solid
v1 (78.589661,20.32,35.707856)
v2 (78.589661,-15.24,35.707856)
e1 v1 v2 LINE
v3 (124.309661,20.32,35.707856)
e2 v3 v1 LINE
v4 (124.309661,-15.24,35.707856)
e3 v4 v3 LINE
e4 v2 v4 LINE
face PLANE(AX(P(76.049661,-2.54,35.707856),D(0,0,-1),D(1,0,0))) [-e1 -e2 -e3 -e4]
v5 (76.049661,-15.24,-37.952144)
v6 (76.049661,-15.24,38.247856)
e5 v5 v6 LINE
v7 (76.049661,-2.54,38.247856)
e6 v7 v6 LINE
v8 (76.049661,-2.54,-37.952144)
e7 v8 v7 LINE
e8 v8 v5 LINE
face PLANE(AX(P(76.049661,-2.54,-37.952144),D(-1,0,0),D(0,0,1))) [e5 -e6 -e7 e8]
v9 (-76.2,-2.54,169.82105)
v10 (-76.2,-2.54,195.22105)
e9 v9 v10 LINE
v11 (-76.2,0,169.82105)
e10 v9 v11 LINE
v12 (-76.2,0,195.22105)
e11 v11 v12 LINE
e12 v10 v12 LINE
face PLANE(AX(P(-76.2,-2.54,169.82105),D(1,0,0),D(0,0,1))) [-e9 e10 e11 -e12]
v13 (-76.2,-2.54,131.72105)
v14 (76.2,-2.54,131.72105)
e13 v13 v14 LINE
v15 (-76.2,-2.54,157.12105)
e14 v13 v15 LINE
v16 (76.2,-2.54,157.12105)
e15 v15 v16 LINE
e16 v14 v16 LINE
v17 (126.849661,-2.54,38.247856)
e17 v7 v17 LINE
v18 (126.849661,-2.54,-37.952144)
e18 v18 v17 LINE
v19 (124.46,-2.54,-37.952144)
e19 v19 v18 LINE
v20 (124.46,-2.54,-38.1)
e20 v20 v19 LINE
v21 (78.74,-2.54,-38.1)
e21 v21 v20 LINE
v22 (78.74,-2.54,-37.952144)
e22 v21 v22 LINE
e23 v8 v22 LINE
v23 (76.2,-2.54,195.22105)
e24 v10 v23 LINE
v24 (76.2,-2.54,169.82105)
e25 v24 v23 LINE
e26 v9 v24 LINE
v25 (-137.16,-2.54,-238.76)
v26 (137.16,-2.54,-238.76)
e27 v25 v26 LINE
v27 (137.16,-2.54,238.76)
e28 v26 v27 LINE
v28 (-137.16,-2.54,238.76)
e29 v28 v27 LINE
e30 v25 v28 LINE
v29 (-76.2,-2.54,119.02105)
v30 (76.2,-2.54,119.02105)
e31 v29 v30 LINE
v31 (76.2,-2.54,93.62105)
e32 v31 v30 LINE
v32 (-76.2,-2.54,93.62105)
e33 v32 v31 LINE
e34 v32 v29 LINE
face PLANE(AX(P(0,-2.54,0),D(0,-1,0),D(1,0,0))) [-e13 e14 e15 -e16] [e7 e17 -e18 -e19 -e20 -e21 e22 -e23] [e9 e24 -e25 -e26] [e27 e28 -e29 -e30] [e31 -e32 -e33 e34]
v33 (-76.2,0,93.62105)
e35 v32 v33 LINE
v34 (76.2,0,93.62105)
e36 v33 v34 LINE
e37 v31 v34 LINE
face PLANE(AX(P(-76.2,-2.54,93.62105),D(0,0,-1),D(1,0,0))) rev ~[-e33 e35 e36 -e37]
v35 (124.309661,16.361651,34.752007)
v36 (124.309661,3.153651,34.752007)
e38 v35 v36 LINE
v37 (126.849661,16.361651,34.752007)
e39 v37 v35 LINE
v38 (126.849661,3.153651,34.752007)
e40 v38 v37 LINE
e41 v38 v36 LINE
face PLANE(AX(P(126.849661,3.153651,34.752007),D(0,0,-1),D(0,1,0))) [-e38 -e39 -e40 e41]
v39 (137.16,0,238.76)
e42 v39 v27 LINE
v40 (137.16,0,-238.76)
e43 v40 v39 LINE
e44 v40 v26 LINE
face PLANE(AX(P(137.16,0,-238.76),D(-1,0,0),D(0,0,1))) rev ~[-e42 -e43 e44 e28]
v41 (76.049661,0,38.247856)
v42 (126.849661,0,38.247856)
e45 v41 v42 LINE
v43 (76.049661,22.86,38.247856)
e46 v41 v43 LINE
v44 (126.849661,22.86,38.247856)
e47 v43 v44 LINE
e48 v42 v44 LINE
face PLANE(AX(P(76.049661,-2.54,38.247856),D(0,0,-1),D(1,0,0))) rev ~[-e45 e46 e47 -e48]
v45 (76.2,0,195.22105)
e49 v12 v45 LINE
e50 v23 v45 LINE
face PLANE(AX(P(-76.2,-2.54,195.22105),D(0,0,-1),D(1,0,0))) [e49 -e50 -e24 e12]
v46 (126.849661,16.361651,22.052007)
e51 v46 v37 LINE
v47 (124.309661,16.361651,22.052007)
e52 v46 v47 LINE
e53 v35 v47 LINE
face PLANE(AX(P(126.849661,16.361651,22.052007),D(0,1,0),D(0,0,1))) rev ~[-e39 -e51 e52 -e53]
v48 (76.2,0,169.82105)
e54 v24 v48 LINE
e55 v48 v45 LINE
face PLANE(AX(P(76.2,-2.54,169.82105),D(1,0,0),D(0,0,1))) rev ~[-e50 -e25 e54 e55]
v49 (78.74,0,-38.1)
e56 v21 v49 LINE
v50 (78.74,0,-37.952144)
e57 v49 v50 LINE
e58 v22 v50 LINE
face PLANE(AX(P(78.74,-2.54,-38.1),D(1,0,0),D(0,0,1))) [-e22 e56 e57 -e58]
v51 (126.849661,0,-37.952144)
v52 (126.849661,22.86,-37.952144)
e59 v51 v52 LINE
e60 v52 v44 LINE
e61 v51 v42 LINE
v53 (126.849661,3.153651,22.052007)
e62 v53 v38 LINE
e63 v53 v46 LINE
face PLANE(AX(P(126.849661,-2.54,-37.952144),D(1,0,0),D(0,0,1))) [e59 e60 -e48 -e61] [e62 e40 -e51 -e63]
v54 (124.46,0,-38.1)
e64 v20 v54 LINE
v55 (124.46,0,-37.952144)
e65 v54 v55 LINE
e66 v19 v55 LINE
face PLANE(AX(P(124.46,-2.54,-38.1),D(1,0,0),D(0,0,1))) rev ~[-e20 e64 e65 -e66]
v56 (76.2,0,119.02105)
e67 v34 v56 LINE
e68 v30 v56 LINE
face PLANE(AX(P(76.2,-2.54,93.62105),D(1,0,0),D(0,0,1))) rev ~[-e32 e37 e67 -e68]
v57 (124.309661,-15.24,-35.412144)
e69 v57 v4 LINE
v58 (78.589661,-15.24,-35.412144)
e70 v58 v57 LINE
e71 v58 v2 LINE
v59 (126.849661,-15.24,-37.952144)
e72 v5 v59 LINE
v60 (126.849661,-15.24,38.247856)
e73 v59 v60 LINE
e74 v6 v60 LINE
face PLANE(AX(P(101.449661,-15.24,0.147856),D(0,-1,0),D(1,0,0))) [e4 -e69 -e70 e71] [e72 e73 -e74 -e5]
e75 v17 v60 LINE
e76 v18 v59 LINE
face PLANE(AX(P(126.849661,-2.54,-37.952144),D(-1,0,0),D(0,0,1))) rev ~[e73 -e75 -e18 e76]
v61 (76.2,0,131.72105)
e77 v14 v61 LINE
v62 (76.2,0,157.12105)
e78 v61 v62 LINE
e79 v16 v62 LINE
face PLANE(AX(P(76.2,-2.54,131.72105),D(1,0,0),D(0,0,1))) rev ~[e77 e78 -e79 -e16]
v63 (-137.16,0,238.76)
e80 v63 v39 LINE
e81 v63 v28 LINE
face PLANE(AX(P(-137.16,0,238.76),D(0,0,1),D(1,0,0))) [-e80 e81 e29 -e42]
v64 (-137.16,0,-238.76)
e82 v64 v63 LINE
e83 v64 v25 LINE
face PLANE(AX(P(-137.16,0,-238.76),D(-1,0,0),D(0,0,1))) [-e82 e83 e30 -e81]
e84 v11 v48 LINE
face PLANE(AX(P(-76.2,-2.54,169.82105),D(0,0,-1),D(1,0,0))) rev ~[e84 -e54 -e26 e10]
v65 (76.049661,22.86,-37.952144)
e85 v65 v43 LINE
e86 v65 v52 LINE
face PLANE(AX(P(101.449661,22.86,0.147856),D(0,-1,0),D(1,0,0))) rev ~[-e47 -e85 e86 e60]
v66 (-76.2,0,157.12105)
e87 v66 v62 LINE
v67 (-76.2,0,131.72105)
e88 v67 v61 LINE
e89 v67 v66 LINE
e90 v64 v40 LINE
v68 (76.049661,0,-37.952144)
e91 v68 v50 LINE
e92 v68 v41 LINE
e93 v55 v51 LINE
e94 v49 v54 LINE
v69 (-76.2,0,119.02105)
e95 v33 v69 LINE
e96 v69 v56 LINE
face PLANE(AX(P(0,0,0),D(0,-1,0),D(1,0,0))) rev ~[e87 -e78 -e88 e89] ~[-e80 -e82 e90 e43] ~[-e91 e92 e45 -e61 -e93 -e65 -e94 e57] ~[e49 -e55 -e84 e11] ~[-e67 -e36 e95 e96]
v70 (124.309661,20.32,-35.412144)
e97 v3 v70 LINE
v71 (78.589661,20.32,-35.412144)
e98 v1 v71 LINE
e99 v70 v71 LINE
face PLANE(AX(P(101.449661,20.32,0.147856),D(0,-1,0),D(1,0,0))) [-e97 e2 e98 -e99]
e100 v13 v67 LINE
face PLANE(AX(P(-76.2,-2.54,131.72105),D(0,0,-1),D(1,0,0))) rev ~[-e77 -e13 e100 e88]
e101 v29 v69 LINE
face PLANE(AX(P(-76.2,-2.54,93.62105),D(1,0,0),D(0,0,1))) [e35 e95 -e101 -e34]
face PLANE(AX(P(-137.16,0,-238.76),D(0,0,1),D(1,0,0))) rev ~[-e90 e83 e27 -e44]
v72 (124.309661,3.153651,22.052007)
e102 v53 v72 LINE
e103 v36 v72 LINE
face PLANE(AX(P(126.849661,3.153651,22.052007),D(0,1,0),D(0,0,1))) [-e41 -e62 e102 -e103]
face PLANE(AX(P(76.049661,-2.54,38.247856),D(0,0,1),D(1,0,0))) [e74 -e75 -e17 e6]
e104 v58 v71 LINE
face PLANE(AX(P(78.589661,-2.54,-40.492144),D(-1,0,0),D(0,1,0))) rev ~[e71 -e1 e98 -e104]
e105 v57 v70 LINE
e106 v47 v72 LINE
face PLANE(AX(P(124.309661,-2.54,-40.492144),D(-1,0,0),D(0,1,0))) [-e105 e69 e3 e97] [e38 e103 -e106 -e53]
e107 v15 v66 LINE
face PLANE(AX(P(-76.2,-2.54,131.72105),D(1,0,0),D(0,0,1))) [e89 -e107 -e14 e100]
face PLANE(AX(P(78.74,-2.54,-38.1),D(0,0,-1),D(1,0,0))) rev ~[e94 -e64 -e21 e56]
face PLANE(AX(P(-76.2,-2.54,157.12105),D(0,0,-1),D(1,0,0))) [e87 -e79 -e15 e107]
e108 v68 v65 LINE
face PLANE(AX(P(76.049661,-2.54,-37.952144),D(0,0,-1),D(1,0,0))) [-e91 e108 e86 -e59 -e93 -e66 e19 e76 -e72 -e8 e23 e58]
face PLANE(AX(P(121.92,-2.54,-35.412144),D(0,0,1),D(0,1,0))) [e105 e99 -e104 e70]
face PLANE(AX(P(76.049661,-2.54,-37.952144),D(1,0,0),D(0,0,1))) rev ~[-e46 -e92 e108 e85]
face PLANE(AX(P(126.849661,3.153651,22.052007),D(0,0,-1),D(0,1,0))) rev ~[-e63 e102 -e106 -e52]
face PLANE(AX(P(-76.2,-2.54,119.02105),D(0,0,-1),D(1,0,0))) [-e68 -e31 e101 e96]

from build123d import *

# Parameters (mm, degrees)
F0_W          = 274.32
F0_H          = 477.52
F1_DEPTH      = 2.54
F2_W          = 152.4
F2_H          = 25.4
F3_W          = 152.4
F3_H          = 25.4
F4_W          = 152.4
F4_H          = 25.4
F5_DEPTH      = 25.4
F6_W          = 45.72
F6_H          = 76.2
F7_DEPTH      = 25.4
F8_W          = 50.8
F8_H          = 76.2
F9_DEPTH      = 12.7
F9_DEPTH_BACK = 25.4
F10_T         = 2.54
F10_T3_DEPTH  = 7.4696609569
F10_T5_DEPTH  = 81.28
F10_T7_DEPTH  = 55.88
F10_T9_DEPTH  = 7.7703390431
F10_T11_DEPTH = 7.62
F11_W         = 13.208
F11_H         = 12.7
F12_DEPTH     = 25.4


# Not quite as in the source:
# - a shell that OpenCascade refuses in one call is made with other operations: the cavity is built on its own and cut out


with BuildPart() as f1:
    # F0 (on Front) → F1 (new body)
    with BuildSketch(Plane.XZ):
        Rectangle(F0_W, F0_H)
    extrude(amount=F1_DEPTH)

    # F2 (on face) + F3 (on face) + F4 (on face) → F5 (cut)
    with BuildSketch(Plane.XZ.offset(2.54)):
        with Locations((0, 182.5210501183)):
            Rectangle(F2_W, F2_H)
    with BuildSketch(Plane.XZ.offset(2.54)):
        with Locations((0, 144.4210501183)):
            Rectangle(F3_W, F3_H)
    with BuildSketch(Plane.XZ.offset(2.54)):
        with Locations((0, 106.3210501183)):
            Rectangle(F4_W, F4_H)
    extrude(amount=-F5_DEPTH, mode=Mode.SUBTRACT)

    # F6 (on face) → F7 (cut)
    with BuildSketch(Plane.XZ.offset(2.54)):
        with Locations((101.6, 0)):
            Rectangle(F6_W, F6_H)
    extrude(amount=-F7_DEPTH, mode=Mode.SUBTRACT)

    # F8 (on face) → F9 (join, two sides)
    with BuildSketch(Plane.XZ.offset(2.54)) as f9_sk:
        with Locations((101.4496609569, 0.1478558406)):
            Rectangle(F8_W, F8_H)
    extrude(amount=F9_DEPTH)
    extrude(f9_sk.sketch, amount=-F9_DEPTH_BACK)

    # F10: shell of thickness 2.54, made by hand


with BuildPart() as f10_core1:
    # F10_t2: copy of F1
    add(f1.part)

    # the walls: a layer under each face that stays
    f10_faces = [f10_core1.faces().sort_by_distance(p)[0] for p in [
        (0, -1.27, 238.76),
        (137.16, -1.27, 0),
        (-137.16, -1.27, 0),
        (0, 0, 0),
        (0, -2.54, 0),
        (0, -1.27, -238.76),
        (101.6, -1.27, -38.1),
        (124.46, -1.27, -38.0260720797),
        (101.4496609569, 3.81, -37.9521441594),
        (126.8496609569, 11.43, 0.1478558406),
        (101.4496609569, 11.43, 38.2478558406),
        (76.0496609569, 11.43, 0.1478558406),
        (78.74, -1.27, -38.0260720797),
        (-76.2, -1.27, 106.3210501183),
        (0, -1.27, 119.0210501183),
        (0, -1.27, 93.6210501183),
        (76.2, -1.27, 106.3210501183),
        (0, -1.27, 131.7210501183),
        (-76.2, -1.27, 144.4210501183),
        (76.2, -1.27, 144.4210501183),
        (0, -1.27, 157.1210501183),
        (0, -1.27, 169.8210501183),
        (-76.2, -1.27, 182.5210501183),
        (76.2, -1.27, 182.5210501183),
        (0, -1.27, 195.2210501183),
        (126.8496609569, -8.89, 0.1478558406),
        (101.4496609569, -8.89, 38.2478558406),
        (76.0496609569, -8.89, 0.1478558406),
        (101.4496609569, 22.86, 0.1478558406),
    ]]
    thicken(f10_faces, amount=-F10_T, mode=Mode.SUBTRACT)

    # F10_s4 → F10_t3 (cut)
    with BuildSketch(Plane.YZ.offset(121.92)):
        Polygon((0.0254, -37.9775441594), (-2.54, -37.9521441594), (-2.54, -35.4121441594), (0, -35.4121441594), align=None)
        Polygon((-2.5654, -37.9775441594), (0, -37.9521441594), (0, -35.4121441594), (-2.54, -35.4121441594), align=None)
    extrude(amount=F10_T3_DEPTH, mode=Mode.SUBTRACT)

    # F10_s6 → F10_t5 (cut)
    with BuildSketch(Plane.XY.offset(-40.4921441594)):
        Polygon((126.8750609569, 0.0254), (126.8496609569, -2.54), (124.3096609569, -2.54), (124.3096609569, 0), align=None)
        Polygon((76.0242609569, 0.0254), (76.0496609569, -2.54), (78.5896609569, -2.54), (78.5896609569, 0), align=None)
        Polygon((126.8750609569, -2.5654), (126.8496609569, 0), (124.3096609569, 0), (124.3096609569, -2.54), align=None)
        Polygon((76.0242609569, -2.5654), (76.0496609569, 0), (78.5896609569, 0), (78.5896609569, -2.54), align=None)
    extrude(amount=F10_T5_DEPTH, mode=Mode.SUBTRACT)

    # F10_s8 → F10_t7 (cut)
    with BuildSketch(Plane.YZ.offset(73.5096609569)):
        Polygon((0.0254, 38.2732558406), (-2.54, 38.2478558406), (-2.54, 35.7078558406), (0, 35.7078558406), align=None)
        Polygon((-2.5654, 38.2732558406), (0, 38.2478558406), (0, 35.7078558406), (-2.54, 35.7078558406), align=None)
    extrude(amount=F10_T7_DEPTH, mode=Mode.SUBTRACT)

    # F10_s10 → F10_t9 (cut)
    with BuildSketch(Plane.YZ.offset(73.5096609569)):
        Polygon((0.0254, -37.9775441594), (-2.54, -37.9521441594), (-2.54, -35.4121441594), (0, -35.4121441594), align=None)
        Polygon((-2.5654, -37.9775441594), (0, -37.9521441594), (0, -35.4121441594), (-2.54, -35.4121441594), align=None)
    extrude(amount=F10_T9_DEPTH, mode=Mode.SUBTRACT)

    # F10_s12 → F10_t11 (cut)
    with BuildSketch(Plane.XZ.offset(-2.54)):
        Polygon((124.4346, -38.0746), (124.46, -40.64), (127, -40.64), (127, -38.1), align=None)
        Polygon((78.7654, -38.0746), (78.74, -40.64), (76.2, -40.64), (76.2, -38.1), align=None)
        Polygon((124.4346, -37.9775441594), (127, -37.9521441594), (127, -35.4121441594), (124.46, -35.4121441594), align=None)
        Polygon((78.7654, -37.9775441594), (78.74, -35.4121441594), (76.2, -35.4121441594), (76.2, -37.9521441594), align=None)
        Polygon((-76.1746, 93.6464501183), (-78.74, 93.6210501183), (-78.74, 91.0810501183), (-76.2, 91.0810501183), align=None)
        Polygon((-76.1746, 118.9956501183), (-78.74, 119.0210501183), (-78.74, 121.5610501183), (-76.2, 121.5610501183), align=None)
        Polygon((76.1746, 118.9956501183), (76.2, 121.5610501183), (78.74, 121.5610501183), (78.74, 119.0210501183), align=None)
        Polygon((76.1746, 93.6464501183), (76.2, 91.0810501183), (78.74, 91.0810501183), (78.74, 93.6210501183), align=None)
        Polygon((76.1746, 131.7464501183), (76.2, 129.1810501183), (78.74, 129.1810501183), (78.74, 131.7210501183), align=None)
        Polygon((-76.1746, 131.7464501183), (-76.2, 129.1810501183), (-78.74, 129.1810501183), (-78.74, 131.7210501183), align=None)
        Polygon((-76.1746, 157.0956501183), (-78.74, 157.1210501183), (-78.74, 159.6610501183), (-76.2, 159.6610501183), align=None)
        Polygon((76.1746, 157.0956501183), (78.74, 157.1210501183), (78.74, 159.6610501183), (76.2, 159.6610501183), align=None)
        Polygon((76.1746, 169.8464501183), (76.2, 167.2810501183), (78.74, 167.2810501183), (78.74, 169.8210501183), align=None)
        Polygon((-76.1746, 169.8464501183), (-76.2, 167.2810501183), (-78.74, 167.2810501183), (-78.74, 169.8210501183), align=None)
        Polygon((-76.1746, 195.1956501183), (-78.74, 195.2210501183), (-78.74, 197.7610501183), (-76.2, 197.7610501183), align=None)
        Polygon((76.1746, 195.1956501183), (78.74, 195.2210501183), (78.74, 197.7610501183), (76.2, 197.7610501183), align=None)
    extrude(amount=F10_T11_DEPTH, mode=Mode.SUBTRACT)


with BuildPart() as f1_1:
    add(f1.part)

    # what is left inside the walls is the cavity
    f10_cavity = [f10_core1.part.solids().sort_by_distance(p)[0] for p in [
        (101.449661, -15.2146, -11.705477),
    ]]
    add(f10_cavity, mode=Mode.SUBTRACT)

    # F11 (on face) → F12 (cut)
    with BuildSketch(Plane.YZ.offset(126.8496609569)):
        with Locations((9.7576510161, 28.402006929)):
            Rectangle(F11_W, F11_H)
    extrude(amount=-F12_DEPTH, mode=Mode.SUBTRACT)


solid = f1_1.part
